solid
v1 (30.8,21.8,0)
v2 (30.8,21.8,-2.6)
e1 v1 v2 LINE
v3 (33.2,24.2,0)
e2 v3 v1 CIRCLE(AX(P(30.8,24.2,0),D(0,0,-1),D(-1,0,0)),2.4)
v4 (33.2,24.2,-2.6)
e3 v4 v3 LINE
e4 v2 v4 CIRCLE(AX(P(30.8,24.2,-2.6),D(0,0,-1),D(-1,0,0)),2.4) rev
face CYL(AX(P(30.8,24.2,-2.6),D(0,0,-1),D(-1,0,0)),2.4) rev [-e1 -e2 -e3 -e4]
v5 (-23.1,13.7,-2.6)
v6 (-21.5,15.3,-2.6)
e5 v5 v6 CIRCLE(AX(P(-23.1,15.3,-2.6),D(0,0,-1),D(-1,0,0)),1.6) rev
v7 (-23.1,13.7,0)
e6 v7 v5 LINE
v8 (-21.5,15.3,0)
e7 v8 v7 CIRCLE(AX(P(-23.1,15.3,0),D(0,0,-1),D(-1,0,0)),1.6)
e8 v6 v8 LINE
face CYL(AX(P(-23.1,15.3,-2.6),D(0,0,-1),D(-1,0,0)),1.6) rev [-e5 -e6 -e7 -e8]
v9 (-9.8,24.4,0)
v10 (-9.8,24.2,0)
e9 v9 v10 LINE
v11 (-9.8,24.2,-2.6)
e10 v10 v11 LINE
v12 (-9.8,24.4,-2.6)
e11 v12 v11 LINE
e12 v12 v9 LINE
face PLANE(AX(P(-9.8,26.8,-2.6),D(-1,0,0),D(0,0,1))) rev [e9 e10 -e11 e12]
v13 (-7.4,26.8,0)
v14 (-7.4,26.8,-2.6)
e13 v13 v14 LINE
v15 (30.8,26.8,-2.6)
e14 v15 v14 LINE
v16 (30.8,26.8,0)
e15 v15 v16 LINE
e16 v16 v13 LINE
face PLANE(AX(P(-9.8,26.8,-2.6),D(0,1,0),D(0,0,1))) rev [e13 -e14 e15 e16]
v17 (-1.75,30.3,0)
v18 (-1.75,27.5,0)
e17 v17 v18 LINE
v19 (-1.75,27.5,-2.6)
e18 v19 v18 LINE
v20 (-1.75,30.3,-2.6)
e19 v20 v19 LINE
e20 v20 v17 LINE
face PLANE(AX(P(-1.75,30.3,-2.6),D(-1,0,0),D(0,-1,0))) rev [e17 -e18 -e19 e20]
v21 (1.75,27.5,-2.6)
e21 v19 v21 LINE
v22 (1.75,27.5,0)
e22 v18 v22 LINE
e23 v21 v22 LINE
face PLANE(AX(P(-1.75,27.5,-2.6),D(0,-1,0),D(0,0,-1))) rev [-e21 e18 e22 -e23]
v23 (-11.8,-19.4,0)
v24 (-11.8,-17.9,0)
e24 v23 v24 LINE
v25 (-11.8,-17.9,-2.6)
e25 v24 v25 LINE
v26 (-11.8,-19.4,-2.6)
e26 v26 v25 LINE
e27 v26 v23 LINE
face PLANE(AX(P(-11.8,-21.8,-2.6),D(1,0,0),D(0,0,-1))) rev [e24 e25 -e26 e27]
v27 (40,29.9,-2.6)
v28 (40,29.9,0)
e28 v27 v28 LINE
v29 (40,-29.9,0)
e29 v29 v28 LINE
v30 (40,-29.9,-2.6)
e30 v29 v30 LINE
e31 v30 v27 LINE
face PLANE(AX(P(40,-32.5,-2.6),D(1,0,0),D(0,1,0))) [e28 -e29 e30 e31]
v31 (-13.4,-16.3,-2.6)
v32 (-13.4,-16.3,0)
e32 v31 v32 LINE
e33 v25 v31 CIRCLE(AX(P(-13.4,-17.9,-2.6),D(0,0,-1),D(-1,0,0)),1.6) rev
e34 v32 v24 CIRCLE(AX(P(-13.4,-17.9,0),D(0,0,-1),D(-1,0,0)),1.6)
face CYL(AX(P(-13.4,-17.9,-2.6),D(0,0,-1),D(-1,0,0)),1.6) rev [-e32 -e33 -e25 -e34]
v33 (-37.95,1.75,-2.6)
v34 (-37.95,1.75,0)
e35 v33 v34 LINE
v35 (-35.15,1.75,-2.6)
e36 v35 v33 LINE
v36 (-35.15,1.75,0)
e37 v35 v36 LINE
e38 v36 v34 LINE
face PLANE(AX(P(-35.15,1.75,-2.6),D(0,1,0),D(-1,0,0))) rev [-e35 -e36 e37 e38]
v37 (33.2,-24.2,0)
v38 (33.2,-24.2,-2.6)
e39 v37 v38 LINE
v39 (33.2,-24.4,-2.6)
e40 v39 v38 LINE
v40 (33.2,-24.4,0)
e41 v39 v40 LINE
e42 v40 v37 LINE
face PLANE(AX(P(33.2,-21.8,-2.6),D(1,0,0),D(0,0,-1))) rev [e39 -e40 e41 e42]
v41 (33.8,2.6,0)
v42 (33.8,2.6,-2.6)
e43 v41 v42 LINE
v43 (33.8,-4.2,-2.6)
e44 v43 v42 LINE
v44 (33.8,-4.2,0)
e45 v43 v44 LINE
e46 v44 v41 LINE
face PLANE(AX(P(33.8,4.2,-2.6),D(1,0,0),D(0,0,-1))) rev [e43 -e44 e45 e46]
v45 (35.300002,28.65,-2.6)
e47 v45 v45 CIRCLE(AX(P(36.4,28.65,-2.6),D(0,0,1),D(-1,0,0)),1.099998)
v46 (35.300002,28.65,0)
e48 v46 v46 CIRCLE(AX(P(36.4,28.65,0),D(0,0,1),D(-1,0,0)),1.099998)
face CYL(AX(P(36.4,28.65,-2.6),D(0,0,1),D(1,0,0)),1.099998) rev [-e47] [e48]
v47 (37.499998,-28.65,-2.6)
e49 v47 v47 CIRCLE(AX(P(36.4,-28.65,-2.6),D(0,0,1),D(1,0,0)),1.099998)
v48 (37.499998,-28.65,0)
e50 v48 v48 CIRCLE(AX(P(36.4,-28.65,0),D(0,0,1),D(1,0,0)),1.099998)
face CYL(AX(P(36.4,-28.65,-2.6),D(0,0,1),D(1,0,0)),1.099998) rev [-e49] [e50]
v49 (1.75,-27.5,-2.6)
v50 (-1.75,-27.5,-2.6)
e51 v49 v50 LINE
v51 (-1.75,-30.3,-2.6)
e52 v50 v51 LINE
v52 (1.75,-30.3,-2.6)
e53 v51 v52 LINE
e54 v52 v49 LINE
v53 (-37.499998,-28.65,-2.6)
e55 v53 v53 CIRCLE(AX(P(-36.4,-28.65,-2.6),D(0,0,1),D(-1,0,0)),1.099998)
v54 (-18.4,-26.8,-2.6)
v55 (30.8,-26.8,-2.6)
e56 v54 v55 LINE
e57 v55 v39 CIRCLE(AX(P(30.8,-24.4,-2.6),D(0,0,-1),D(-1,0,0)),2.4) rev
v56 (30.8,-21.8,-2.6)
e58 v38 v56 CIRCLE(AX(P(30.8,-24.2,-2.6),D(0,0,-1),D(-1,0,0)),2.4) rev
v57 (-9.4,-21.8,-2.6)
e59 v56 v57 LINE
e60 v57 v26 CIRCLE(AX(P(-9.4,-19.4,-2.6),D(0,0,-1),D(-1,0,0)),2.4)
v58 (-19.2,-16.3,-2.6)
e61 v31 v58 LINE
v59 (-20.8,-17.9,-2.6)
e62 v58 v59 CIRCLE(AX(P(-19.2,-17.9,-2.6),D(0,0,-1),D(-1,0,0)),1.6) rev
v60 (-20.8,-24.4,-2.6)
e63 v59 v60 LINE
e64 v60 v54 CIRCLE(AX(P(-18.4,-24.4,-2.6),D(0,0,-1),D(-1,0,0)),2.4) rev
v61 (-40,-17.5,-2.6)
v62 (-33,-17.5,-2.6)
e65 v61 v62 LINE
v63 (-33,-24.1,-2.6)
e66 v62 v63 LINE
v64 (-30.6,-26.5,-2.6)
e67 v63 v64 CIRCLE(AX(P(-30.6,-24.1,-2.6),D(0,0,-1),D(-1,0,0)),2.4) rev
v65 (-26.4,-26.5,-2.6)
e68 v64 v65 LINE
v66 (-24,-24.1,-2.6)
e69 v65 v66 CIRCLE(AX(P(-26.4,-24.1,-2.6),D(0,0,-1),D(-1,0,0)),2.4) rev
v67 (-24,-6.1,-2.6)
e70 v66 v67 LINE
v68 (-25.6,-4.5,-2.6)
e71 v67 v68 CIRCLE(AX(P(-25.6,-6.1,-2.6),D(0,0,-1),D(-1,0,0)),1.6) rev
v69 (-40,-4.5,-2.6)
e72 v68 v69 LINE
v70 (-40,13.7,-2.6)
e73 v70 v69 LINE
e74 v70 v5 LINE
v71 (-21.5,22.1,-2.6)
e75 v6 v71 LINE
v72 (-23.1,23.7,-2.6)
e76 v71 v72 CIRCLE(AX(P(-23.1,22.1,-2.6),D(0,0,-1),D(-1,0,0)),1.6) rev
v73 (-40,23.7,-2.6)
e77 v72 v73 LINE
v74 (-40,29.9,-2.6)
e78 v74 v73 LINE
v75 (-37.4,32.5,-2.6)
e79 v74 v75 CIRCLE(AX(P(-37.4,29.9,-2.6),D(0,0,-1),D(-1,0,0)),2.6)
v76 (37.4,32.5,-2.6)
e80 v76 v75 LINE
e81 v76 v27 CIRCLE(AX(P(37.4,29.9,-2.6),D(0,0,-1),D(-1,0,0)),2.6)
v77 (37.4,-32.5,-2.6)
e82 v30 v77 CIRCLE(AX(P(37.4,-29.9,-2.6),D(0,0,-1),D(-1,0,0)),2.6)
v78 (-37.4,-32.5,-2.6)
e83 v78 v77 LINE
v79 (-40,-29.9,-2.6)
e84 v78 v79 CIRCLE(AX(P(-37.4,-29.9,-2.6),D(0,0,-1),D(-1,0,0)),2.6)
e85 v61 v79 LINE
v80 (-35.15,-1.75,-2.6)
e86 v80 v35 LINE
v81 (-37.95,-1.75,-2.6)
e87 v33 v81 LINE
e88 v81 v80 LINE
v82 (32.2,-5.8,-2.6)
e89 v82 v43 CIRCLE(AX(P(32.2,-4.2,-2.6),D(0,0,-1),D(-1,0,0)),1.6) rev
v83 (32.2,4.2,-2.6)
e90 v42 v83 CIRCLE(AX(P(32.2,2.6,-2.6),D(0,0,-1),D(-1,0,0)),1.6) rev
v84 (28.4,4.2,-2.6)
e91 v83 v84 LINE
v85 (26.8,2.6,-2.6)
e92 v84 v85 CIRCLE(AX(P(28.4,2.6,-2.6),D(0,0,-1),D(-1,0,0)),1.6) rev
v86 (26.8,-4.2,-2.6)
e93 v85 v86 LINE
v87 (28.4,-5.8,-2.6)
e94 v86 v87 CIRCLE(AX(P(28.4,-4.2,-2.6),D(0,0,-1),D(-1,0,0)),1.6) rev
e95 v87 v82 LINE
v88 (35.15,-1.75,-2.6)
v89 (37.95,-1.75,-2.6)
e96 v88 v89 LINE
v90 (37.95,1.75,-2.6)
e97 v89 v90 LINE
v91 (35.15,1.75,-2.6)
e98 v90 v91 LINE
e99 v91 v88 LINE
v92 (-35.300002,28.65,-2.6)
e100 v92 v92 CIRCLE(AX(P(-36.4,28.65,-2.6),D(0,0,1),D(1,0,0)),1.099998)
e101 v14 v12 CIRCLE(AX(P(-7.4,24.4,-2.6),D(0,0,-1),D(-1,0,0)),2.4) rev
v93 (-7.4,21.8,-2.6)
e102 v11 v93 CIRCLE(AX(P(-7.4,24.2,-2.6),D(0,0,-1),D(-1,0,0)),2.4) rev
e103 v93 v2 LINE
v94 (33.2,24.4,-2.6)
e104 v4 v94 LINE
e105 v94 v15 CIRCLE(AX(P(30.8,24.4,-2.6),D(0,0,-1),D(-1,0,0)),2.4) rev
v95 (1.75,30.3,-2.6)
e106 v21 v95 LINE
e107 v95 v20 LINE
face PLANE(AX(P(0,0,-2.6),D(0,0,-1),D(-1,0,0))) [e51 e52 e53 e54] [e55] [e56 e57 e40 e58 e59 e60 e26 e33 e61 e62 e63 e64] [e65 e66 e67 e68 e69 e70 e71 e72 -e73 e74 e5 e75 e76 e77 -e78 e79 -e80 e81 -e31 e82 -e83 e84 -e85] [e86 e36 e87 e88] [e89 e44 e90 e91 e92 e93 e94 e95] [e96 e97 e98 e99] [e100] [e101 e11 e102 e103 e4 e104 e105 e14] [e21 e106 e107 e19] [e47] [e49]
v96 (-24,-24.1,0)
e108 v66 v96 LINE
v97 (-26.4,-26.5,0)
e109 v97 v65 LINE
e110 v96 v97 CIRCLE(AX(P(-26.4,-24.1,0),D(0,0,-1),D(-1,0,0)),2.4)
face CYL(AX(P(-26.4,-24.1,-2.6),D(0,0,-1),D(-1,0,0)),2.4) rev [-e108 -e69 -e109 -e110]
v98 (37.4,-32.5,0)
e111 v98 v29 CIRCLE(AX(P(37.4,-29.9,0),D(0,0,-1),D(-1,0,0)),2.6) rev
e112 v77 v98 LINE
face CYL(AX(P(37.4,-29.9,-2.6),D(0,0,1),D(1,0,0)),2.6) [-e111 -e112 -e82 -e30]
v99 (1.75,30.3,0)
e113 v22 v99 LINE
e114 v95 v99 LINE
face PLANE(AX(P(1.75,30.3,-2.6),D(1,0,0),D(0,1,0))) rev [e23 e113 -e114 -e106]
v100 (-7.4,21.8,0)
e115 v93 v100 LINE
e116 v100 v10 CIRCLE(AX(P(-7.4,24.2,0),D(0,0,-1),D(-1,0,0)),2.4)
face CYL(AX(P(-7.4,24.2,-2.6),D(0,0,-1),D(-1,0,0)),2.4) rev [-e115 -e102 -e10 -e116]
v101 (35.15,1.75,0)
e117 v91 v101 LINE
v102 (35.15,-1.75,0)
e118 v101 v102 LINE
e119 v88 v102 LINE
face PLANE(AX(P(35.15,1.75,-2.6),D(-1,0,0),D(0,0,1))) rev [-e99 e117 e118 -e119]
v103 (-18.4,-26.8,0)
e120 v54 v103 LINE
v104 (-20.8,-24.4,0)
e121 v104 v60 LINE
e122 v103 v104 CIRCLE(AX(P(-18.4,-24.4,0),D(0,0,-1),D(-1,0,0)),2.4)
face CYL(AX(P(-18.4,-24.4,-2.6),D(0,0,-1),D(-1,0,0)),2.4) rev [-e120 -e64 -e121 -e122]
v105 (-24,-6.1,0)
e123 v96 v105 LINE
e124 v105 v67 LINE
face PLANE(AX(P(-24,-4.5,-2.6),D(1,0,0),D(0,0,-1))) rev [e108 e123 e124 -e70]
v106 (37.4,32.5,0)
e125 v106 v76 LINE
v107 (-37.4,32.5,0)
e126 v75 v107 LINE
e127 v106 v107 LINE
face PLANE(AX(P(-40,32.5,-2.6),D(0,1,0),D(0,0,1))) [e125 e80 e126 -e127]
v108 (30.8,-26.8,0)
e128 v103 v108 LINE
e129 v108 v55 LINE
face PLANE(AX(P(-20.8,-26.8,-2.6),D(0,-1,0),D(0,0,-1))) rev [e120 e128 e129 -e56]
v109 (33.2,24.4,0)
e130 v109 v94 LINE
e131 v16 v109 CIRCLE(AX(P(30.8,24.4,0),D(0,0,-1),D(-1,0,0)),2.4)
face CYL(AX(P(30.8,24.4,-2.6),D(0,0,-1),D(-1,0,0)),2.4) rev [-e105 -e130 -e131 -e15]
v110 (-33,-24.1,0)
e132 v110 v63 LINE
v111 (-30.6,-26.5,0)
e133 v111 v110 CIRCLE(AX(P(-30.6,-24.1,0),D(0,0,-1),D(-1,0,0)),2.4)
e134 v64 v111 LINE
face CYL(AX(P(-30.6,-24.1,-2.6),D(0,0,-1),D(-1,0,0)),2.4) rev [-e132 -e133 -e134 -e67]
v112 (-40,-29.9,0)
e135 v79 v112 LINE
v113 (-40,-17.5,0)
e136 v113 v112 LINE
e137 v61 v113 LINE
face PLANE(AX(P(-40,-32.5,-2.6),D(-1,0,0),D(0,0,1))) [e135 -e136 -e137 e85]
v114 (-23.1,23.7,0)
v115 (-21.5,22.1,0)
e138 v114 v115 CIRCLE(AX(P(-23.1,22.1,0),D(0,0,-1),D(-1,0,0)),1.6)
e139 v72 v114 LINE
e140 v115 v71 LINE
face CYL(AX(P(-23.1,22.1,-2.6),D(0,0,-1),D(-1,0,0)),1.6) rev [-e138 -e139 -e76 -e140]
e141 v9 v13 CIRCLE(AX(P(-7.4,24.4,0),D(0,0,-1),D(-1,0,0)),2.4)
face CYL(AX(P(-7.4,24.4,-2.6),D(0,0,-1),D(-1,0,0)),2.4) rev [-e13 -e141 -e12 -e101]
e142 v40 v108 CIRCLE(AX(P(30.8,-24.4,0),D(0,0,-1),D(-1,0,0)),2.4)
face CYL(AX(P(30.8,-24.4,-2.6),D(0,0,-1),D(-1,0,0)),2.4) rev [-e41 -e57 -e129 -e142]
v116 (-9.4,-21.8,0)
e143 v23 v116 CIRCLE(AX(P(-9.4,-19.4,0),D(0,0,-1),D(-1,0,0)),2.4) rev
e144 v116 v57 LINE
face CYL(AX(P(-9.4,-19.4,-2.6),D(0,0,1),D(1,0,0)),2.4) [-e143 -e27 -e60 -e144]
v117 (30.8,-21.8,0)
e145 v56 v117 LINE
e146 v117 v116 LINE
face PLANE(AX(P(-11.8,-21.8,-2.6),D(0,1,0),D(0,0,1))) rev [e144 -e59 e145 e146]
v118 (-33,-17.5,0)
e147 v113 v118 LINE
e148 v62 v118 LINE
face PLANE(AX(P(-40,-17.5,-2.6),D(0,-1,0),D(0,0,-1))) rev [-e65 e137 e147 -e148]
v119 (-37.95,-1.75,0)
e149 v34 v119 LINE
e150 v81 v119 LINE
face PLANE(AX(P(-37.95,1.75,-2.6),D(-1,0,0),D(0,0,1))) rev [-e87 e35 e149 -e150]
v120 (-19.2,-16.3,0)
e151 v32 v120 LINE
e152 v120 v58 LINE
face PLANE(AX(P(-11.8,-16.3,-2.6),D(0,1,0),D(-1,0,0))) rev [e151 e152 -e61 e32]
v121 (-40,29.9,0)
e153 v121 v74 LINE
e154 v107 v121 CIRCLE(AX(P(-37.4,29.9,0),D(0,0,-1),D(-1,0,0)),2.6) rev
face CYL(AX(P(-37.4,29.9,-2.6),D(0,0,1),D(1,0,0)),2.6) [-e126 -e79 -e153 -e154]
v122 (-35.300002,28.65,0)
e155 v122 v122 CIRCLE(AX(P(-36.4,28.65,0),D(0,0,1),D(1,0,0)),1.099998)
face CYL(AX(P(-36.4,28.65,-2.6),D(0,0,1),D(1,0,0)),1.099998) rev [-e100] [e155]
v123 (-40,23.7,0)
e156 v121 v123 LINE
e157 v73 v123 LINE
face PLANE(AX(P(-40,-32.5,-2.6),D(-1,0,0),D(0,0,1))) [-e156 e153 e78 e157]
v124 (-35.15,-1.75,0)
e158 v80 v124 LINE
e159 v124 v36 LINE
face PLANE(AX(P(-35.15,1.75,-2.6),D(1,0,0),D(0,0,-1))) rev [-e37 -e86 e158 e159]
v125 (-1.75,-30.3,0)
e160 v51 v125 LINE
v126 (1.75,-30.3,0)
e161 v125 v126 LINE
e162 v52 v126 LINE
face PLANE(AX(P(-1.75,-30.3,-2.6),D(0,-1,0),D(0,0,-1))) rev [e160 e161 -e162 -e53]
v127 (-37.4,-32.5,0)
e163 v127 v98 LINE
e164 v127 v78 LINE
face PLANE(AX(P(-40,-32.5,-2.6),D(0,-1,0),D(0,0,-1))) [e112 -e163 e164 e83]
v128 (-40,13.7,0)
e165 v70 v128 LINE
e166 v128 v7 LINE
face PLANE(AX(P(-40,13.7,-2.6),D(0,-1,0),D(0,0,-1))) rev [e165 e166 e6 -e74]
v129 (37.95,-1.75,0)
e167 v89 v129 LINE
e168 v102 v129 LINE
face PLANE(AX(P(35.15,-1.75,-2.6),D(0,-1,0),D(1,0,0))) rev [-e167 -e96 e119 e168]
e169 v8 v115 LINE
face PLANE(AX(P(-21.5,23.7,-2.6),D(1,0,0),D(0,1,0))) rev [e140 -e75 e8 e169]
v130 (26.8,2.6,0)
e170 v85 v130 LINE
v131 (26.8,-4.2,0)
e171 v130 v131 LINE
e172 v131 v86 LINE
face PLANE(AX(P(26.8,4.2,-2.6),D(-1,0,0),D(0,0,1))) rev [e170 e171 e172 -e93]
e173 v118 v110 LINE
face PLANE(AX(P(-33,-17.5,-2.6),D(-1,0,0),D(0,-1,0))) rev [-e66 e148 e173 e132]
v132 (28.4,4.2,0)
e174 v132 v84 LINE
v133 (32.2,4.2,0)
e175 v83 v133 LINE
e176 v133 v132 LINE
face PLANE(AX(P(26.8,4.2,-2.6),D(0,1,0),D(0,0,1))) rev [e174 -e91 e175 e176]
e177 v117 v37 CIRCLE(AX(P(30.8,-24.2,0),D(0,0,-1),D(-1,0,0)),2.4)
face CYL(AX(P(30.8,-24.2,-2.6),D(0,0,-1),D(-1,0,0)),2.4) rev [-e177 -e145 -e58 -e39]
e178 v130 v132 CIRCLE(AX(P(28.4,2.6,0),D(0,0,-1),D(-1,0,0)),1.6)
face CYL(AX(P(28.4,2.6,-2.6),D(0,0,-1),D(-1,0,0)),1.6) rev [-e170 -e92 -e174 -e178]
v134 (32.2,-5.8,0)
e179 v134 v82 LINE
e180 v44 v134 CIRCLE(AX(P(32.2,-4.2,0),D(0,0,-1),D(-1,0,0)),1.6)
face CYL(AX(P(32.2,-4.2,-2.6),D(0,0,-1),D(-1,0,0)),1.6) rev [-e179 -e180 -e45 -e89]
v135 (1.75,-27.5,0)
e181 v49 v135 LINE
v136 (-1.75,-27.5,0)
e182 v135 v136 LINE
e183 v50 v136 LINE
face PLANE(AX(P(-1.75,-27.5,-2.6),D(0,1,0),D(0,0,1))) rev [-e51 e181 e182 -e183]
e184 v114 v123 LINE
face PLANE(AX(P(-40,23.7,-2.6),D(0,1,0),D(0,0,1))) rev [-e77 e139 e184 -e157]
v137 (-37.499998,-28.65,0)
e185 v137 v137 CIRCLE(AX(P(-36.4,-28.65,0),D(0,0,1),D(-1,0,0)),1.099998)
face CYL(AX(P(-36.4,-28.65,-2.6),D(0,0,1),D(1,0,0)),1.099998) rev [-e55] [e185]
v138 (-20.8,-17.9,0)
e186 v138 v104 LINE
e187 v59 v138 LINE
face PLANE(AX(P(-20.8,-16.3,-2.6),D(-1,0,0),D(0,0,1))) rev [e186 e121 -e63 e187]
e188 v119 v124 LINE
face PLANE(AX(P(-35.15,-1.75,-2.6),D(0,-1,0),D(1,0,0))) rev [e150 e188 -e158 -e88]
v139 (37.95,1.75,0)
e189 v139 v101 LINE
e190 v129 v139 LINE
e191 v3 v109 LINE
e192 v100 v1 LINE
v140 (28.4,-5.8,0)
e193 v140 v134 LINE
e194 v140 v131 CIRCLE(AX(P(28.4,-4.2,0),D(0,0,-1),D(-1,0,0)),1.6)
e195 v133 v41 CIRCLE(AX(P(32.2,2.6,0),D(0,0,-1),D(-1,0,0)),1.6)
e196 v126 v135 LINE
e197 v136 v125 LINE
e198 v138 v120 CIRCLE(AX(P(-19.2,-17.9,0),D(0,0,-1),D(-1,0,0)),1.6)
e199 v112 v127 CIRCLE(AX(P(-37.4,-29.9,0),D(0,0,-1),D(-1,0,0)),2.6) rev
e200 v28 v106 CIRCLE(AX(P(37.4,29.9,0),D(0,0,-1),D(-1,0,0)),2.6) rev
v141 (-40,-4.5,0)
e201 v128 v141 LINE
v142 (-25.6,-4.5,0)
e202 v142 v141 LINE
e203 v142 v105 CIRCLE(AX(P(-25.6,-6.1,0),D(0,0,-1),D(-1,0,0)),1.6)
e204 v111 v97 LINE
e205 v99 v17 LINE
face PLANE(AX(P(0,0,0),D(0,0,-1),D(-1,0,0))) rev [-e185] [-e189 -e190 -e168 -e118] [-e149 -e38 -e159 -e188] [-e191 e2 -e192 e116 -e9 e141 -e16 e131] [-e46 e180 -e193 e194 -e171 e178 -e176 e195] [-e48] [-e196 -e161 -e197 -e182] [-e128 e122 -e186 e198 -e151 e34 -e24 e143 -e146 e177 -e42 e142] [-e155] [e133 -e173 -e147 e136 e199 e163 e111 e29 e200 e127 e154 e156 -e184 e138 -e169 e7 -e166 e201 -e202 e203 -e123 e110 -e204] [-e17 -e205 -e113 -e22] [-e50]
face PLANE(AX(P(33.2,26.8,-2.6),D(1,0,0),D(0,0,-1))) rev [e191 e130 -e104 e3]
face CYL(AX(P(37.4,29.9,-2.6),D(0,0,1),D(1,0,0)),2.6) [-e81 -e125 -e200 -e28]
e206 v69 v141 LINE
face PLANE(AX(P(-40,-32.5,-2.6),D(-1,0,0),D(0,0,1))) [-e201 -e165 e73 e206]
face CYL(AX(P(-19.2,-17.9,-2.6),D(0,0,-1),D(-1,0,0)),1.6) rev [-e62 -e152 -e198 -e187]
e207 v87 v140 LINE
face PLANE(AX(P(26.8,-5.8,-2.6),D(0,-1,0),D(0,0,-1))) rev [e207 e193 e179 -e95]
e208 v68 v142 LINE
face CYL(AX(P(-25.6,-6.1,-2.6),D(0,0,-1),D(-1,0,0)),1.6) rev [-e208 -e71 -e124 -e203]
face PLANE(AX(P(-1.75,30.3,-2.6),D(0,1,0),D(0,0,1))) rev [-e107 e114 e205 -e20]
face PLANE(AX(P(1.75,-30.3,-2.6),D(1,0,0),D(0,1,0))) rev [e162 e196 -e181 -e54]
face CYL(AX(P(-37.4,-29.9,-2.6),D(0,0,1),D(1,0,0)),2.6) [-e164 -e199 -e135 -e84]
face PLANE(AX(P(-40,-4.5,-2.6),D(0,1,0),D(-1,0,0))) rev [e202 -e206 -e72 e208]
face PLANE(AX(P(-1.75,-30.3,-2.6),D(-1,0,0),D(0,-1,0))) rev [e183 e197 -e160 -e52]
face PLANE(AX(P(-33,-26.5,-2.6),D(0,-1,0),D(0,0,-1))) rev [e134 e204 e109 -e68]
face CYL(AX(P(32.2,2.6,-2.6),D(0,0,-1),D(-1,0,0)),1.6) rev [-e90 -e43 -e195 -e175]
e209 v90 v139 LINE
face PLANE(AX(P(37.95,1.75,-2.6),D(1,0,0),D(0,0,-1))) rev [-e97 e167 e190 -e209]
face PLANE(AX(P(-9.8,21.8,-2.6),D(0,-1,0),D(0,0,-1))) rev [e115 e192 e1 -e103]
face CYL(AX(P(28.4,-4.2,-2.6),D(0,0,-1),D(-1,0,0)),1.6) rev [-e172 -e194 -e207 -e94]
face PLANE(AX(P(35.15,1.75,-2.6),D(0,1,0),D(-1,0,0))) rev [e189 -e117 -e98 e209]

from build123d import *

# Parameters (mm, degrees)
SKETCH1_W          = 80
SKETCH1_H          = 65
BASE_FLANGE1_DEPTH = 2.6
SKETCH6_R          = 1.0999978
CUT_EXTRUDE1_DEPTH = 10
FILLET1_R          = 2.6
SKETCH7_W          = 18.5
SKETCH7_H          = 10
SKETCH7_W_2        = 43
SKETCH7_H_2        = 5
SKETCH7_W_3        = 7
CUT_EXTRUDE2_DEPTH = 2.6
FILLET2_R          = 2.4
FILLET3_R          = 1.6
SKETCH11_W         = 3.5
SKETCH11_H         = 2.8
SKETCH11_W_2       = 2.8
SKETCH11_H_2       = 3.5
CUT_EXTRUDE5_DEPTH = 10


# Sheet-metal steps are written as plain solids
with BuildPart() as part:
    # Sketch1 → Base-Flange1 (new body)
    with BuildSketch(Plane.XY):
        Rectangle(SKETCH1_W, SKETCH1_H)
    extrude(amount=-BASE_FLANGE1_DEPTH)

    # Sketch6 → Cut-Extrude1 (cut)
    with BuildSketch(Plane.XY):
        with Locations((-36.4, 28.65)):
            Circle(SKETCH6_R)
        with Locations(Location((-36.4, -28.65, 0), (0, 0, 180))):
            Circle(SKETCH6_R)
        with Locations((36.4, -28.65)):
            Circle(SKETCH6_R)
        with Locations(Location((36.4, 28.65, 0), (0, 0, 180))):
            Circle(SKETCH6_R)
    extrude(amount=-CUT_EXTRUDE1_DEPTH, mode=Mode.SUBTRACT)

    # Fillet1
    fillet1_edges = [part.edges().sort_by_distance(p)[0] for p in [
        (-40, 32.5, -1.3),
        (40, 32.5, -1.3),
        (40, -32.5, -1.3),
        (-40, -32.5, -1.3),
    ]]
    fillet(fillet1_edges, radius=FILLET1_R)

    # Sketch7 → Cut-Extrude2 (cut)
    with BuildSketch(Plane.XY):
        with Locations((-30.75, 18.7)):
            Rectangle(SKETCH7_W, SKETCH7_H)
        Polygon((-40, -4.5), (-24, -4.5), (-24, -26.5), (-33, -26.5), (-33, -17.5), (-40, -17.5), align=None)
        with Locations((11.7, 24.3)):
            Rectangle(SKETCH7_W_2, SKETCH7_H_2)
        Polygon((-11.8, -21.8), (-11.8, -16.3), (-20.8, -16.3), (-20.8, -26.8), (33.2, -26.8), (33.2, -21.8), align=None)
        with Locations((30.3, -0.8)):
            Rectangle(SKETCH7_W_3, SKETCH7_H)
    extrude(amount=-CUT_EXTRUDE2_DEPTH, mode=Mode.SUBTRACT)

    # Fillet2
    fillet2_edges = [part.edges().sort_by_distance(p)[0] for p in [
        (-9.8, 21.8, -1.3),
        (-9.8, 26.8, -1.3),
        (33.2, 26.8, -1.3),
        (33.2, 21.8, -1.3),
        (33.2, -21.8, -1.3),
        (33.2, -26.8, -1.3),
        (-20.8, -26.8, -1.3),
        (-11.8, -21.8, -1.3),
        (-24, -26.5, -1.3),
        (-33, -26.5, -1.3),
    ]]
    fillet(fillet2_edges, radius=FILLET2_R)

    # Fillet3
    fillet3_edges = [part.edges().sort_by_distance(p)[0] for p in [
        (26.8, -5.8, -1.3),
        (26.8, 4.2, -1.3),
        (33.8, 4.2, -1.3),
        (33.8, -5.8, -1.3),
        (-20.8, -16.3, -1.3),
        (-11.8, -16.3, -1.3),
        (-21.5, 23.7, -1.3),
        (-21.5, 13.7, -1.3),
        (-24, -4.5, -1.3),
    ]]
    fillet(fillet3_edges, radius=FILLET3_R)

    # Sketch11 → Cut-Extrude5 (cut)
    with BuildSketch(Plane.XY):
        with Locations((0, 28.9)):
            Rectangle(SKETCH11_W, SKETCH11_H)
        with Locations((36.55, 0)):
            Rectangle(SKETCH11_W_2, SKETCH11_H_2)
        with Locations((0, -28.9)):
            Rectangle(SKETCH11_W, SKETCH11_H)
        with Locations((-36.55, 0)):
            Rectangle(SKETCH11_W_2, SKETCH11_H_2)
    extrude(amount=-CUT_EXTRUDE5_DEPTH, mode=Mode.SUBTRACT)


solid = part.part
